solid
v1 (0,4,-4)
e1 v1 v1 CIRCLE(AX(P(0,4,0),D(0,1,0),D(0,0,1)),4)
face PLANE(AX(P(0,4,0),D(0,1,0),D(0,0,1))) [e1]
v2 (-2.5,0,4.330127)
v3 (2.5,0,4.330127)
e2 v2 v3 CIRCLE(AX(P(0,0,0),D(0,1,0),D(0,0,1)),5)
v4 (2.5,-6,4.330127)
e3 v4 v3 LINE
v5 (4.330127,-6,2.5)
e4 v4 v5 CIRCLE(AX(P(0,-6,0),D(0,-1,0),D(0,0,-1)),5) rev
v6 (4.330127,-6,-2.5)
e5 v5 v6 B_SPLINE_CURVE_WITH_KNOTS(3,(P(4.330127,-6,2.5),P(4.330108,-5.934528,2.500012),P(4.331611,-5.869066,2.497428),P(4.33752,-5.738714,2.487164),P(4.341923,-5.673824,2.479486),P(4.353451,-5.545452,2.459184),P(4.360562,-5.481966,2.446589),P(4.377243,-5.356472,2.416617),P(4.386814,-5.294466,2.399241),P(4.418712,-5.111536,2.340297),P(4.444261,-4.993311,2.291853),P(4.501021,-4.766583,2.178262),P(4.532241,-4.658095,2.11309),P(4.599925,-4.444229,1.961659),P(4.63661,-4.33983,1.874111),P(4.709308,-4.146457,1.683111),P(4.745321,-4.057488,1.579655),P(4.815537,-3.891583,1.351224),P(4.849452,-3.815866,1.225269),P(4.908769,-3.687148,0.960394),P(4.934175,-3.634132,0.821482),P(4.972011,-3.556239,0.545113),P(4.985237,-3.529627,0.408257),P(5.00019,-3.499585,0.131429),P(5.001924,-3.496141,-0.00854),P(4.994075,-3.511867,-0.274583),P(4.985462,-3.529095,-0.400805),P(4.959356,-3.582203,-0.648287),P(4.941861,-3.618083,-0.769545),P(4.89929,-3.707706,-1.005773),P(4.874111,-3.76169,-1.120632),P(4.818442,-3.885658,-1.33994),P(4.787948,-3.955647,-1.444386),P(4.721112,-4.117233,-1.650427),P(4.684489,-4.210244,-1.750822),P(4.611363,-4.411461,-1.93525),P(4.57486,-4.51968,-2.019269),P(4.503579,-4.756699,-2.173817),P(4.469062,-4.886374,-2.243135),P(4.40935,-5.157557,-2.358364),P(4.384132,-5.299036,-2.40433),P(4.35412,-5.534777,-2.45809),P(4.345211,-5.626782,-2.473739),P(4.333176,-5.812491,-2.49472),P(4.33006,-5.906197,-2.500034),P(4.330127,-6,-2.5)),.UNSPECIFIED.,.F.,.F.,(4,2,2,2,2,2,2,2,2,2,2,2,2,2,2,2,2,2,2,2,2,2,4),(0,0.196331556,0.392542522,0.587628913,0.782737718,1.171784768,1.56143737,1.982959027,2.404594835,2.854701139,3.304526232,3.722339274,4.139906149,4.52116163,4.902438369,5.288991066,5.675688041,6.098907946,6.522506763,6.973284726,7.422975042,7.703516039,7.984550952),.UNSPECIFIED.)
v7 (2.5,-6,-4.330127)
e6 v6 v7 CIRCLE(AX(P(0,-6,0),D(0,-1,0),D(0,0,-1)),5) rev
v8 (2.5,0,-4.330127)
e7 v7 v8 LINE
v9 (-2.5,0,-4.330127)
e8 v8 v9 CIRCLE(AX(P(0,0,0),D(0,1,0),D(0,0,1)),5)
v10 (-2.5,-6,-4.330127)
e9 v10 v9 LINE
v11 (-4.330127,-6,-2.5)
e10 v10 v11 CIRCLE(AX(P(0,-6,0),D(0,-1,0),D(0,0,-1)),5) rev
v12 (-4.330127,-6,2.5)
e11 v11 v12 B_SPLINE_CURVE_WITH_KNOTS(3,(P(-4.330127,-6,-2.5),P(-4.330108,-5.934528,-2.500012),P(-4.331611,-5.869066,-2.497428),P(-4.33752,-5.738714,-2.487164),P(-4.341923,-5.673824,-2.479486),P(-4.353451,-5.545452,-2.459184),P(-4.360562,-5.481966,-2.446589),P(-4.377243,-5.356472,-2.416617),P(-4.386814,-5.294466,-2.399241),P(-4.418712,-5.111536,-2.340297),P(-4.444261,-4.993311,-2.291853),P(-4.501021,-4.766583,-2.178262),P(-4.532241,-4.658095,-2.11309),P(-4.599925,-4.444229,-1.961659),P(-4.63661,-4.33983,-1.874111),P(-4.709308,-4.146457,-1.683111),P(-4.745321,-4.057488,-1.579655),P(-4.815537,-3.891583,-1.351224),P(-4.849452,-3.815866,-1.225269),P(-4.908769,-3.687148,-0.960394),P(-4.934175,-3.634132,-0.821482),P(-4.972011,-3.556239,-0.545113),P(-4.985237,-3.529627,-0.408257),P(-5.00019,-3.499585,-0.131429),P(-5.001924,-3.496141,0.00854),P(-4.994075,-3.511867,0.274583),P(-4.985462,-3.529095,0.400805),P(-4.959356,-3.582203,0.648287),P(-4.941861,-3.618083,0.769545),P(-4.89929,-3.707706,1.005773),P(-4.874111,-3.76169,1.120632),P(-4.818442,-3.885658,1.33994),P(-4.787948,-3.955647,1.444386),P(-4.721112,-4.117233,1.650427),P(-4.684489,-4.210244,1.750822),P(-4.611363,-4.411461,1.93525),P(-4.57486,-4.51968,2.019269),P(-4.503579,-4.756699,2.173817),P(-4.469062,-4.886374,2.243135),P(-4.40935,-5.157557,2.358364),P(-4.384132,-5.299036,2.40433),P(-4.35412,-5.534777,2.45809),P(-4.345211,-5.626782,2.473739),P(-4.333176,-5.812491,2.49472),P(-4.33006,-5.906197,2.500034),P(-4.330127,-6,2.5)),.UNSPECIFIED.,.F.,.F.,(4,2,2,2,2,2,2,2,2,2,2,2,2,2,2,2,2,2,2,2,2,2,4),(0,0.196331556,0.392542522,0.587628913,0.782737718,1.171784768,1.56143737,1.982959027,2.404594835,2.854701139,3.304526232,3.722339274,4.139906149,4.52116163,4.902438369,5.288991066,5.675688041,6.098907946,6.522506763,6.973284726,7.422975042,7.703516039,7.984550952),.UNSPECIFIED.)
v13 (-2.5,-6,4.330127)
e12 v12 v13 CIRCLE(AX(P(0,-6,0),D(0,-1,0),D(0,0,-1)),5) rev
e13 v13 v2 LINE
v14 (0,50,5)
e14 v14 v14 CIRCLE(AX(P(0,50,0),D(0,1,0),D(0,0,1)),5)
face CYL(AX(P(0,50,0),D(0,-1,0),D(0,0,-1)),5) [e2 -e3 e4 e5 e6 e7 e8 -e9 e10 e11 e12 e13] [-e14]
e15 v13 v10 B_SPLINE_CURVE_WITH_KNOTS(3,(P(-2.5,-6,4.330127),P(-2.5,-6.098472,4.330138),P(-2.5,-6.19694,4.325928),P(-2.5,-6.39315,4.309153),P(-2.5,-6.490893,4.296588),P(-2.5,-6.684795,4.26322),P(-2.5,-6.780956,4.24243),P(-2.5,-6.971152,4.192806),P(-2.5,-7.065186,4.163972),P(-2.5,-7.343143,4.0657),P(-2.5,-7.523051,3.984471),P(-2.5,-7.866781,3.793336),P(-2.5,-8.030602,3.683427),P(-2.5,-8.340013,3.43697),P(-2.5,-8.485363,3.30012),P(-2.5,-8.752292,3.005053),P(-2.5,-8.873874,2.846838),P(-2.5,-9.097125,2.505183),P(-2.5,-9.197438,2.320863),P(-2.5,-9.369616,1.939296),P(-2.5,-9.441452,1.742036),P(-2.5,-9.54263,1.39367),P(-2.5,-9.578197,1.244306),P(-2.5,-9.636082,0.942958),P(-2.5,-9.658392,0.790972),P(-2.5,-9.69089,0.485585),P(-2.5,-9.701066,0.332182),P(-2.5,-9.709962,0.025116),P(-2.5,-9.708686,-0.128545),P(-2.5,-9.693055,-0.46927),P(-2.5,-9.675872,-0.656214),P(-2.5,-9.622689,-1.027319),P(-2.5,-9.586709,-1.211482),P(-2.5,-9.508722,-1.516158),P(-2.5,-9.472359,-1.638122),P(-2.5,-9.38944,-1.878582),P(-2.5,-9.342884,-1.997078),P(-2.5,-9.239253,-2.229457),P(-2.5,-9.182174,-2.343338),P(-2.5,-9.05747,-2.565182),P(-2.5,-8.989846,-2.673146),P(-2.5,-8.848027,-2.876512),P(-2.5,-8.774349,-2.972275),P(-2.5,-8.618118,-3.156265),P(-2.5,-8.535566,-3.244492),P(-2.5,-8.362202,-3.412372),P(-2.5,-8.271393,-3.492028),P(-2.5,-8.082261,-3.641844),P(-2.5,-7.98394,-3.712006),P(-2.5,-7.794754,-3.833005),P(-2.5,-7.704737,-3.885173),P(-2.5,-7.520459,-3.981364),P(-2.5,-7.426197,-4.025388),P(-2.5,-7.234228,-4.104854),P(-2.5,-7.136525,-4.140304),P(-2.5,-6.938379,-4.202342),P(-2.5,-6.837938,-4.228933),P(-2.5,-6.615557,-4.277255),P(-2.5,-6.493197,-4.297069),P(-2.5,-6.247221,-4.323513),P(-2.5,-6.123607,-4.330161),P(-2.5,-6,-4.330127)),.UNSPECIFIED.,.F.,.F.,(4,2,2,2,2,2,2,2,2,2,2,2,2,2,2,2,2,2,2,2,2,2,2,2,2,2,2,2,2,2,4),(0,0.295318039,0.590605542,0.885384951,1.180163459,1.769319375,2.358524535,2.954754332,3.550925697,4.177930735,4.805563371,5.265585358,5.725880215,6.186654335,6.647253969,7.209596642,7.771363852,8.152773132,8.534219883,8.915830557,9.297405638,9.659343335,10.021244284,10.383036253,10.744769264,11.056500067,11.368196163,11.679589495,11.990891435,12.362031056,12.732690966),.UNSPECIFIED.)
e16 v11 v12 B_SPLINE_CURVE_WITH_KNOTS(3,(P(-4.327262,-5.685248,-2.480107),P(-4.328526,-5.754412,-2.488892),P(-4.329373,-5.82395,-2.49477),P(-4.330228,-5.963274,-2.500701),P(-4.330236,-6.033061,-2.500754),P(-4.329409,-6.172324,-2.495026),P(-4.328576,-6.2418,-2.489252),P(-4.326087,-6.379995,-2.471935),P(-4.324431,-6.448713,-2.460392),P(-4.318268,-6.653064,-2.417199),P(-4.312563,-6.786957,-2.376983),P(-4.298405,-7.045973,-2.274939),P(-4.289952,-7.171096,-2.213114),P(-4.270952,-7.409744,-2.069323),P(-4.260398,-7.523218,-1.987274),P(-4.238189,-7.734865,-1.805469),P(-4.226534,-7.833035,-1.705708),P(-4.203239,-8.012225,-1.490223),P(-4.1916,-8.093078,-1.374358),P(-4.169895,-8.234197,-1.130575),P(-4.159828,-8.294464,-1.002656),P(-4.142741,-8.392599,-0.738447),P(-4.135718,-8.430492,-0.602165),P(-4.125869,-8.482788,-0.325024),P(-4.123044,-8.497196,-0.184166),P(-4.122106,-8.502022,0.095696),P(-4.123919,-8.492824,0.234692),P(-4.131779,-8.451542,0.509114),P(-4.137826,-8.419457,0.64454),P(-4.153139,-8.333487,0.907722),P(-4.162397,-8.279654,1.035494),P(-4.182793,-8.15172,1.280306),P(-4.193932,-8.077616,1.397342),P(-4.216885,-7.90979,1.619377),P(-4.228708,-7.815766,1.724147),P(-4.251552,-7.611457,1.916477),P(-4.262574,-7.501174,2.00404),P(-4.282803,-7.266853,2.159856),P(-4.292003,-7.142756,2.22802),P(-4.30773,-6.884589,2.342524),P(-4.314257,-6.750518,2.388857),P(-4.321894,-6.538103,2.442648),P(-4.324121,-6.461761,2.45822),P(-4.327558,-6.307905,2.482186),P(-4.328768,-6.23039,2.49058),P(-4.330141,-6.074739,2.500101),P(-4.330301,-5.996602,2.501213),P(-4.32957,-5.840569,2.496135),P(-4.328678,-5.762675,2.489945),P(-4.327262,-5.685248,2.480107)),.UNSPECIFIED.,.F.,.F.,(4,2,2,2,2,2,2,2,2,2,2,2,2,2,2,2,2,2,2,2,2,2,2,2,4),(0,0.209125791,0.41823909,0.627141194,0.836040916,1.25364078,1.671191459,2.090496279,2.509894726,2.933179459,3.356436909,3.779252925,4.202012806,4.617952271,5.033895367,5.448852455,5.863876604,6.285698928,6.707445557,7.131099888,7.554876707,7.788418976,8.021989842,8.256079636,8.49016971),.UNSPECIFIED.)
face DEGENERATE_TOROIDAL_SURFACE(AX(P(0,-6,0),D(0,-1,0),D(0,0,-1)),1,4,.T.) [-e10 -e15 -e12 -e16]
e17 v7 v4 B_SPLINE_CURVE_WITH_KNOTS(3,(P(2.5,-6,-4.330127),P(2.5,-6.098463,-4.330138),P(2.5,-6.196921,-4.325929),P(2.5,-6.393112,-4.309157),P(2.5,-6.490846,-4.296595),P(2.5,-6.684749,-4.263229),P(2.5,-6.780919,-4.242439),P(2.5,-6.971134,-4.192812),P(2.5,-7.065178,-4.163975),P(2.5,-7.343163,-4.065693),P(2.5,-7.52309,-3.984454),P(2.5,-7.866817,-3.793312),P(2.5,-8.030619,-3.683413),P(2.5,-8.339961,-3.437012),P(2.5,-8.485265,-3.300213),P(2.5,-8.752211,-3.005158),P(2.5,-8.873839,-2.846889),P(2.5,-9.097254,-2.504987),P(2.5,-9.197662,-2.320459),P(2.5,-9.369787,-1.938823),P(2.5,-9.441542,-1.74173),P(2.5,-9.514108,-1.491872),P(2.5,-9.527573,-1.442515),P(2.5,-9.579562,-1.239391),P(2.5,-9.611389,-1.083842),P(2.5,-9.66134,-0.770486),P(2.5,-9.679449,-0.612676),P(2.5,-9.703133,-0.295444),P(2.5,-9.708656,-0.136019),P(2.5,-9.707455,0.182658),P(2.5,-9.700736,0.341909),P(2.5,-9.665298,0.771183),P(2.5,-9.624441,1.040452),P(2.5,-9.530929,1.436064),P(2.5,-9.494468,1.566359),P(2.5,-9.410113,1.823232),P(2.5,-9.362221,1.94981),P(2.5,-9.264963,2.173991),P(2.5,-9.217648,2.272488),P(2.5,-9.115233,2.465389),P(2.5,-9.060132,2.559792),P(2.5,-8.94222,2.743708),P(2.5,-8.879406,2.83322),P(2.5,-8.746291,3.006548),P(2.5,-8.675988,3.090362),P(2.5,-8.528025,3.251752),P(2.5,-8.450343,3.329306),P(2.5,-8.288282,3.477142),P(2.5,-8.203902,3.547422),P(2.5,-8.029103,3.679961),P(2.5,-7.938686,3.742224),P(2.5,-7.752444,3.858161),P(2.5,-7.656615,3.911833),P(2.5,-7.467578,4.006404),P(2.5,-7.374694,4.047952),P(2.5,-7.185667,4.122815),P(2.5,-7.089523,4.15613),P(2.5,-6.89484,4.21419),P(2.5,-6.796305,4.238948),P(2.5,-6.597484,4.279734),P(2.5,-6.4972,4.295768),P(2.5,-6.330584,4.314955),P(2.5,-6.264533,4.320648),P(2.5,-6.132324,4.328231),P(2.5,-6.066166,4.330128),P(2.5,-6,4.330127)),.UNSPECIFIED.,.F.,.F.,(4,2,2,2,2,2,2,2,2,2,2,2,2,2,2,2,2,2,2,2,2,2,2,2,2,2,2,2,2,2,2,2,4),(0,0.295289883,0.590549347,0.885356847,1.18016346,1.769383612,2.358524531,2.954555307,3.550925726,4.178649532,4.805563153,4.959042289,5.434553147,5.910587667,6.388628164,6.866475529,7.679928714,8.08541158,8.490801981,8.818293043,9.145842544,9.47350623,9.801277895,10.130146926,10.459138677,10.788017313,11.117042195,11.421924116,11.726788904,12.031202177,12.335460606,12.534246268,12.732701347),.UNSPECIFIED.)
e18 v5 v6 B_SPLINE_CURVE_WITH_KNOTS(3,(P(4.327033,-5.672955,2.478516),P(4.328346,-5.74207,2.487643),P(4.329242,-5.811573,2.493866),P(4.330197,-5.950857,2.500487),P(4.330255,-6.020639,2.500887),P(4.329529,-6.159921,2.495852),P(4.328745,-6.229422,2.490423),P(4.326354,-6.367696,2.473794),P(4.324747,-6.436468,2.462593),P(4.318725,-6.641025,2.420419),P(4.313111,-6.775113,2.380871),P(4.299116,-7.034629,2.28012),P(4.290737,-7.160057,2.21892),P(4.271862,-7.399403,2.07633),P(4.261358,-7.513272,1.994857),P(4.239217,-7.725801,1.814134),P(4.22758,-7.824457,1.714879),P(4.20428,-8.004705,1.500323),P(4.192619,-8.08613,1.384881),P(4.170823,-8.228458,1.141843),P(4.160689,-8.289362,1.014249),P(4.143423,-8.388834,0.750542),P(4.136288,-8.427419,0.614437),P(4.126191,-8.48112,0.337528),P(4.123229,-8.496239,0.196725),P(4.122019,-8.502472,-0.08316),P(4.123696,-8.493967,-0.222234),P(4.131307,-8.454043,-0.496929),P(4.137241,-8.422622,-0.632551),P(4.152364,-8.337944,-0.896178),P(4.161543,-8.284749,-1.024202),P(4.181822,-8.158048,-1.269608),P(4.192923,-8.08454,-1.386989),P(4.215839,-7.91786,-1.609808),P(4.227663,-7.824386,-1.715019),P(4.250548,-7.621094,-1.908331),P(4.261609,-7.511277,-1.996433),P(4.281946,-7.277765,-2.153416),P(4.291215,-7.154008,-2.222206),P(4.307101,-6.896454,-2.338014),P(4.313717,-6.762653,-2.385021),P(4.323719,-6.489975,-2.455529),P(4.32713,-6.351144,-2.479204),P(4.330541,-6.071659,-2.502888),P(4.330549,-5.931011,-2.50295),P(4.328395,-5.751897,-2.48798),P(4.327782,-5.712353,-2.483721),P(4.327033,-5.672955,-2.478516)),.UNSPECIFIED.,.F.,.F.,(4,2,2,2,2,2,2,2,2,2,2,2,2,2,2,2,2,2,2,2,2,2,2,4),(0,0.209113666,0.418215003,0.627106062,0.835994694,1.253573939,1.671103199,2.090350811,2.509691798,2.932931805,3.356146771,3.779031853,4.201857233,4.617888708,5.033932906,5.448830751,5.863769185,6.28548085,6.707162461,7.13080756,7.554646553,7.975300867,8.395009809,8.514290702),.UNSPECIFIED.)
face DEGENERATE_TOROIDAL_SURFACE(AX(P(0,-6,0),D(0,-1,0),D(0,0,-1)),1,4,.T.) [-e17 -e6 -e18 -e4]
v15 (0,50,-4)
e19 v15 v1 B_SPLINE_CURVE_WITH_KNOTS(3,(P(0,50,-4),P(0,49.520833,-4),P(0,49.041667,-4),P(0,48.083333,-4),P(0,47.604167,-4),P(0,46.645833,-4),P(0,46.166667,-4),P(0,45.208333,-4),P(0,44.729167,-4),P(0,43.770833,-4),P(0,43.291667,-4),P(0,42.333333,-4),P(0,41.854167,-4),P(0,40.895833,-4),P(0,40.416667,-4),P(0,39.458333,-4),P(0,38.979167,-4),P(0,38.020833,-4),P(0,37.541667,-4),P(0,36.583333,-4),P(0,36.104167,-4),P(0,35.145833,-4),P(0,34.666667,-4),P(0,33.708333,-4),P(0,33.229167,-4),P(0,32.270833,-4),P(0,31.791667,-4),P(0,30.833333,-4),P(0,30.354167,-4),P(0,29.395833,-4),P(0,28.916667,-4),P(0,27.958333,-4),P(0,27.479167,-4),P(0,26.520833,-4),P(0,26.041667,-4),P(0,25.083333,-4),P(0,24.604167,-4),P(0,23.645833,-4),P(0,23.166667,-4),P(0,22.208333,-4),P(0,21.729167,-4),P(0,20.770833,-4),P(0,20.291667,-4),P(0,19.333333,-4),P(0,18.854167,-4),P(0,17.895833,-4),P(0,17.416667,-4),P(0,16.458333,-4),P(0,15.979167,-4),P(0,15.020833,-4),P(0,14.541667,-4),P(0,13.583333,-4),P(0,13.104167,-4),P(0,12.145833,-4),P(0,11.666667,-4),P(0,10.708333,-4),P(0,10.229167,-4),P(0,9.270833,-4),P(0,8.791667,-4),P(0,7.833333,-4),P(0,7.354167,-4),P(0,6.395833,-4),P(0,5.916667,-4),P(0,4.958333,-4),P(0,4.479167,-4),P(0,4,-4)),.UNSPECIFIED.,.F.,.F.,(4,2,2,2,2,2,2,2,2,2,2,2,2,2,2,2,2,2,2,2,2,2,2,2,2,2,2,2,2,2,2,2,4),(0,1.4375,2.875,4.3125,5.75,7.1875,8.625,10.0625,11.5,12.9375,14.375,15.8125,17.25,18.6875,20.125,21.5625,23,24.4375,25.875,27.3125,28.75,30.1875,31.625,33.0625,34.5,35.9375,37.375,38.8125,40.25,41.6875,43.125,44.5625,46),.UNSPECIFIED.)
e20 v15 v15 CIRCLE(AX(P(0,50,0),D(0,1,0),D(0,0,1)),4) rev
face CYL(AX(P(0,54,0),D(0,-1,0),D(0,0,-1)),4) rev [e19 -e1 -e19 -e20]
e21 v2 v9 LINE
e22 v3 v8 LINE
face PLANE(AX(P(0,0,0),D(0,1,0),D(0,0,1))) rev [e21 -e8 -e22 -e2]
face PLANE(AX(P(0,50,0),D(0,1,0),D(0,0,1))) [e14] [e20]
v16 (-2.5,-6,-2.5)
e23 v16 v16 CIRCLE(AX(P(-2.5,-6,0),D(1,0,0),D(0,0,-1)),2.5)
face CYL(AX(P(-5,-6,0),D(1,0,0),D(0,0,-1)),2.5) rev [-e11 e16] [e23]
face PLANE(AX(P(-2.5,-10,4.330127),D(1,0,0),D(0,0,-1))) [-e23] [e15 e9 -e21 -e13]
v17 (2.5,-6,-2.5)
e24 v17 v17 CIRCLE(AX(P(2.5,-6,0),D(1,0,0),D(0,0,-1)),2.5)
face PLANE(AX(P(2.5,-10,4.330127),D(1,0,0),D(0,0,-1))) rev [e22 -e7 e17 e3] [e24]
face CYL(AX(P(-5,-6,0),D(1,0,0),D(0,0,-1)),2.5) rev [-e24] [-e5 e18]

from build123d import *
from build123d.topology import SkipClean

# Parameters (mm, degrees)
SKETCH1_R               = 5
BOSS_EXTRUDE1_DEPTH     = 50
CUT_EXTRUDE1_START      = 4
SKETCH1_3_R             = 4
CUT_EXTRUDE1_DEPTH      = 50
BOSS_EXTRUDE2_START     = 10
BOSS_EXTRUDE2_DEPTH     = 10
FILLET3_R               = 4
CUT_EXTRUDE2_DEPTH      = 51.806003597
CUT_EXTRUDE2_DEPTH_BACK = 51.806003597
SKETCH3_R               = 2.5


with BuildPart() as part:
    # Sketch1 → Boss-Extrude1 (new body)
    with BuildSketch(Plane(origin=(0, 0, 0), x_dir=(1, 0, 0), z_dir=(0, 1, 0))):
        with Locations(Location((0, 0, 0), (0, 0, 270))):
            Circle(SKETCH1_R)
    extrude(amount=BOSS_EXTRUDE1_DEPTH)

    # Sketch1<3> → Cut-Extrude1 (cut)
    with BuildSketch(Plane(origin=(0, 0, 0), x_dir=(1, 0, 0), z_dir=(0, 1, 0)).offset(CUT_EXTRUDE1_START)):
        with Locations(Location((0, 0, 0), (0, 0, 270))):
            Circle(SKETCH1_3_R)
    extrude(amount=CUT_EXTRUDE1_DEPTH, mode=Mode.SUBTRACT)

    # Sketch2 → Boss-Extrude2 (add)
    with SkipClean():  # the faces are left unmerged after this step: merging them gives an invalid solid
        with BuildSketch(Plane.XZ.offset(BOSS_EXTRUDE2_START)):
            with BuildLine():
                Line((-2.5, 4.330127019), (-2.5, -4.330127019))
                ThreePointArc((-2.5, -4.330127019), (-5, 0), (-2.5, 4.330127019))
            make_face()
            with BuildLine():
                Line((2.5, 4.330127019), (2.5, -4.330127019))
                ThreePointArc((2.5, -4.330127019), (5, 0), (2.5, 4.330127019))
            make_face()
        extrude(amount=-BOSS_EXTRUDE2_DEPTH)

    # Fillet3
    # the kernel refuses this fillet: 4 mm, written as the material it takes off along each edge
    with BuildSketch(Plane(origin=(0, -10, 0), x_dir=(0.9956817269656716, 0, -0.09283263750781805), z_dir=(0.09283263750781805, 0, 0.9956817269656716))) as fillet3_piece_1:
        with BuildLine():
            CenterArc((5 - FILLET3_R, FILLET3_R), FILLET3_R, 270, 90)
            Line((5 - FILLET3_R, 0), (5, 0))
            Line((5, 0), (5, FILLET3_R))
        make_face()
    revolve(axis=Axis((0, -10, 0), (0, 1, 0)), revolution_arc=349.34682448, mode=Mode.SUBTRACT)
    with BuildSketch(Plane(origin=(0, -10, 0), x_dir=(-0.9956817269656714, 0, -0.09283263750781937), z_dir=(-0.09283263750781937, 0, 0.9956817269656714))) as fillet3_piece_2:
        with BuildLine():
            CenterArc((5 - FILLET3_R, -FILLET3_R), FILLET3_R, 0, 90)
            Line((5 - FILLET3_R, 0), (5, 0))
            Line((5, 0), (5, -FILLET3_R))
        make_face()
    revolve(axis=Axis((0, -10, 0), (0, -1, 0)), revolution_arc=349.34682448, mode=Mode.SUBTRACT)

    # Sketch3 → Cut-Extrude2 (cut, two sides: drawn at the far end of the back side and taken through both)
    with BuildSketch(Plane(origin=(-2.5, 0, 0), x_dir=(0, 0, -1), z_dir=(1, 0, 0)).offset(-CUT_EXTRUDE2_DEPTH_BACK)):
        with Locations((0, -6)):
            Circle(SKETCH3_R)
    extrude(amount=CUT_EXTRUDE2_DEPTH + CUT_EXTRUDE2_DEPTH_BACK, mode=Mode.SUBTRACT)


solid = part.part
